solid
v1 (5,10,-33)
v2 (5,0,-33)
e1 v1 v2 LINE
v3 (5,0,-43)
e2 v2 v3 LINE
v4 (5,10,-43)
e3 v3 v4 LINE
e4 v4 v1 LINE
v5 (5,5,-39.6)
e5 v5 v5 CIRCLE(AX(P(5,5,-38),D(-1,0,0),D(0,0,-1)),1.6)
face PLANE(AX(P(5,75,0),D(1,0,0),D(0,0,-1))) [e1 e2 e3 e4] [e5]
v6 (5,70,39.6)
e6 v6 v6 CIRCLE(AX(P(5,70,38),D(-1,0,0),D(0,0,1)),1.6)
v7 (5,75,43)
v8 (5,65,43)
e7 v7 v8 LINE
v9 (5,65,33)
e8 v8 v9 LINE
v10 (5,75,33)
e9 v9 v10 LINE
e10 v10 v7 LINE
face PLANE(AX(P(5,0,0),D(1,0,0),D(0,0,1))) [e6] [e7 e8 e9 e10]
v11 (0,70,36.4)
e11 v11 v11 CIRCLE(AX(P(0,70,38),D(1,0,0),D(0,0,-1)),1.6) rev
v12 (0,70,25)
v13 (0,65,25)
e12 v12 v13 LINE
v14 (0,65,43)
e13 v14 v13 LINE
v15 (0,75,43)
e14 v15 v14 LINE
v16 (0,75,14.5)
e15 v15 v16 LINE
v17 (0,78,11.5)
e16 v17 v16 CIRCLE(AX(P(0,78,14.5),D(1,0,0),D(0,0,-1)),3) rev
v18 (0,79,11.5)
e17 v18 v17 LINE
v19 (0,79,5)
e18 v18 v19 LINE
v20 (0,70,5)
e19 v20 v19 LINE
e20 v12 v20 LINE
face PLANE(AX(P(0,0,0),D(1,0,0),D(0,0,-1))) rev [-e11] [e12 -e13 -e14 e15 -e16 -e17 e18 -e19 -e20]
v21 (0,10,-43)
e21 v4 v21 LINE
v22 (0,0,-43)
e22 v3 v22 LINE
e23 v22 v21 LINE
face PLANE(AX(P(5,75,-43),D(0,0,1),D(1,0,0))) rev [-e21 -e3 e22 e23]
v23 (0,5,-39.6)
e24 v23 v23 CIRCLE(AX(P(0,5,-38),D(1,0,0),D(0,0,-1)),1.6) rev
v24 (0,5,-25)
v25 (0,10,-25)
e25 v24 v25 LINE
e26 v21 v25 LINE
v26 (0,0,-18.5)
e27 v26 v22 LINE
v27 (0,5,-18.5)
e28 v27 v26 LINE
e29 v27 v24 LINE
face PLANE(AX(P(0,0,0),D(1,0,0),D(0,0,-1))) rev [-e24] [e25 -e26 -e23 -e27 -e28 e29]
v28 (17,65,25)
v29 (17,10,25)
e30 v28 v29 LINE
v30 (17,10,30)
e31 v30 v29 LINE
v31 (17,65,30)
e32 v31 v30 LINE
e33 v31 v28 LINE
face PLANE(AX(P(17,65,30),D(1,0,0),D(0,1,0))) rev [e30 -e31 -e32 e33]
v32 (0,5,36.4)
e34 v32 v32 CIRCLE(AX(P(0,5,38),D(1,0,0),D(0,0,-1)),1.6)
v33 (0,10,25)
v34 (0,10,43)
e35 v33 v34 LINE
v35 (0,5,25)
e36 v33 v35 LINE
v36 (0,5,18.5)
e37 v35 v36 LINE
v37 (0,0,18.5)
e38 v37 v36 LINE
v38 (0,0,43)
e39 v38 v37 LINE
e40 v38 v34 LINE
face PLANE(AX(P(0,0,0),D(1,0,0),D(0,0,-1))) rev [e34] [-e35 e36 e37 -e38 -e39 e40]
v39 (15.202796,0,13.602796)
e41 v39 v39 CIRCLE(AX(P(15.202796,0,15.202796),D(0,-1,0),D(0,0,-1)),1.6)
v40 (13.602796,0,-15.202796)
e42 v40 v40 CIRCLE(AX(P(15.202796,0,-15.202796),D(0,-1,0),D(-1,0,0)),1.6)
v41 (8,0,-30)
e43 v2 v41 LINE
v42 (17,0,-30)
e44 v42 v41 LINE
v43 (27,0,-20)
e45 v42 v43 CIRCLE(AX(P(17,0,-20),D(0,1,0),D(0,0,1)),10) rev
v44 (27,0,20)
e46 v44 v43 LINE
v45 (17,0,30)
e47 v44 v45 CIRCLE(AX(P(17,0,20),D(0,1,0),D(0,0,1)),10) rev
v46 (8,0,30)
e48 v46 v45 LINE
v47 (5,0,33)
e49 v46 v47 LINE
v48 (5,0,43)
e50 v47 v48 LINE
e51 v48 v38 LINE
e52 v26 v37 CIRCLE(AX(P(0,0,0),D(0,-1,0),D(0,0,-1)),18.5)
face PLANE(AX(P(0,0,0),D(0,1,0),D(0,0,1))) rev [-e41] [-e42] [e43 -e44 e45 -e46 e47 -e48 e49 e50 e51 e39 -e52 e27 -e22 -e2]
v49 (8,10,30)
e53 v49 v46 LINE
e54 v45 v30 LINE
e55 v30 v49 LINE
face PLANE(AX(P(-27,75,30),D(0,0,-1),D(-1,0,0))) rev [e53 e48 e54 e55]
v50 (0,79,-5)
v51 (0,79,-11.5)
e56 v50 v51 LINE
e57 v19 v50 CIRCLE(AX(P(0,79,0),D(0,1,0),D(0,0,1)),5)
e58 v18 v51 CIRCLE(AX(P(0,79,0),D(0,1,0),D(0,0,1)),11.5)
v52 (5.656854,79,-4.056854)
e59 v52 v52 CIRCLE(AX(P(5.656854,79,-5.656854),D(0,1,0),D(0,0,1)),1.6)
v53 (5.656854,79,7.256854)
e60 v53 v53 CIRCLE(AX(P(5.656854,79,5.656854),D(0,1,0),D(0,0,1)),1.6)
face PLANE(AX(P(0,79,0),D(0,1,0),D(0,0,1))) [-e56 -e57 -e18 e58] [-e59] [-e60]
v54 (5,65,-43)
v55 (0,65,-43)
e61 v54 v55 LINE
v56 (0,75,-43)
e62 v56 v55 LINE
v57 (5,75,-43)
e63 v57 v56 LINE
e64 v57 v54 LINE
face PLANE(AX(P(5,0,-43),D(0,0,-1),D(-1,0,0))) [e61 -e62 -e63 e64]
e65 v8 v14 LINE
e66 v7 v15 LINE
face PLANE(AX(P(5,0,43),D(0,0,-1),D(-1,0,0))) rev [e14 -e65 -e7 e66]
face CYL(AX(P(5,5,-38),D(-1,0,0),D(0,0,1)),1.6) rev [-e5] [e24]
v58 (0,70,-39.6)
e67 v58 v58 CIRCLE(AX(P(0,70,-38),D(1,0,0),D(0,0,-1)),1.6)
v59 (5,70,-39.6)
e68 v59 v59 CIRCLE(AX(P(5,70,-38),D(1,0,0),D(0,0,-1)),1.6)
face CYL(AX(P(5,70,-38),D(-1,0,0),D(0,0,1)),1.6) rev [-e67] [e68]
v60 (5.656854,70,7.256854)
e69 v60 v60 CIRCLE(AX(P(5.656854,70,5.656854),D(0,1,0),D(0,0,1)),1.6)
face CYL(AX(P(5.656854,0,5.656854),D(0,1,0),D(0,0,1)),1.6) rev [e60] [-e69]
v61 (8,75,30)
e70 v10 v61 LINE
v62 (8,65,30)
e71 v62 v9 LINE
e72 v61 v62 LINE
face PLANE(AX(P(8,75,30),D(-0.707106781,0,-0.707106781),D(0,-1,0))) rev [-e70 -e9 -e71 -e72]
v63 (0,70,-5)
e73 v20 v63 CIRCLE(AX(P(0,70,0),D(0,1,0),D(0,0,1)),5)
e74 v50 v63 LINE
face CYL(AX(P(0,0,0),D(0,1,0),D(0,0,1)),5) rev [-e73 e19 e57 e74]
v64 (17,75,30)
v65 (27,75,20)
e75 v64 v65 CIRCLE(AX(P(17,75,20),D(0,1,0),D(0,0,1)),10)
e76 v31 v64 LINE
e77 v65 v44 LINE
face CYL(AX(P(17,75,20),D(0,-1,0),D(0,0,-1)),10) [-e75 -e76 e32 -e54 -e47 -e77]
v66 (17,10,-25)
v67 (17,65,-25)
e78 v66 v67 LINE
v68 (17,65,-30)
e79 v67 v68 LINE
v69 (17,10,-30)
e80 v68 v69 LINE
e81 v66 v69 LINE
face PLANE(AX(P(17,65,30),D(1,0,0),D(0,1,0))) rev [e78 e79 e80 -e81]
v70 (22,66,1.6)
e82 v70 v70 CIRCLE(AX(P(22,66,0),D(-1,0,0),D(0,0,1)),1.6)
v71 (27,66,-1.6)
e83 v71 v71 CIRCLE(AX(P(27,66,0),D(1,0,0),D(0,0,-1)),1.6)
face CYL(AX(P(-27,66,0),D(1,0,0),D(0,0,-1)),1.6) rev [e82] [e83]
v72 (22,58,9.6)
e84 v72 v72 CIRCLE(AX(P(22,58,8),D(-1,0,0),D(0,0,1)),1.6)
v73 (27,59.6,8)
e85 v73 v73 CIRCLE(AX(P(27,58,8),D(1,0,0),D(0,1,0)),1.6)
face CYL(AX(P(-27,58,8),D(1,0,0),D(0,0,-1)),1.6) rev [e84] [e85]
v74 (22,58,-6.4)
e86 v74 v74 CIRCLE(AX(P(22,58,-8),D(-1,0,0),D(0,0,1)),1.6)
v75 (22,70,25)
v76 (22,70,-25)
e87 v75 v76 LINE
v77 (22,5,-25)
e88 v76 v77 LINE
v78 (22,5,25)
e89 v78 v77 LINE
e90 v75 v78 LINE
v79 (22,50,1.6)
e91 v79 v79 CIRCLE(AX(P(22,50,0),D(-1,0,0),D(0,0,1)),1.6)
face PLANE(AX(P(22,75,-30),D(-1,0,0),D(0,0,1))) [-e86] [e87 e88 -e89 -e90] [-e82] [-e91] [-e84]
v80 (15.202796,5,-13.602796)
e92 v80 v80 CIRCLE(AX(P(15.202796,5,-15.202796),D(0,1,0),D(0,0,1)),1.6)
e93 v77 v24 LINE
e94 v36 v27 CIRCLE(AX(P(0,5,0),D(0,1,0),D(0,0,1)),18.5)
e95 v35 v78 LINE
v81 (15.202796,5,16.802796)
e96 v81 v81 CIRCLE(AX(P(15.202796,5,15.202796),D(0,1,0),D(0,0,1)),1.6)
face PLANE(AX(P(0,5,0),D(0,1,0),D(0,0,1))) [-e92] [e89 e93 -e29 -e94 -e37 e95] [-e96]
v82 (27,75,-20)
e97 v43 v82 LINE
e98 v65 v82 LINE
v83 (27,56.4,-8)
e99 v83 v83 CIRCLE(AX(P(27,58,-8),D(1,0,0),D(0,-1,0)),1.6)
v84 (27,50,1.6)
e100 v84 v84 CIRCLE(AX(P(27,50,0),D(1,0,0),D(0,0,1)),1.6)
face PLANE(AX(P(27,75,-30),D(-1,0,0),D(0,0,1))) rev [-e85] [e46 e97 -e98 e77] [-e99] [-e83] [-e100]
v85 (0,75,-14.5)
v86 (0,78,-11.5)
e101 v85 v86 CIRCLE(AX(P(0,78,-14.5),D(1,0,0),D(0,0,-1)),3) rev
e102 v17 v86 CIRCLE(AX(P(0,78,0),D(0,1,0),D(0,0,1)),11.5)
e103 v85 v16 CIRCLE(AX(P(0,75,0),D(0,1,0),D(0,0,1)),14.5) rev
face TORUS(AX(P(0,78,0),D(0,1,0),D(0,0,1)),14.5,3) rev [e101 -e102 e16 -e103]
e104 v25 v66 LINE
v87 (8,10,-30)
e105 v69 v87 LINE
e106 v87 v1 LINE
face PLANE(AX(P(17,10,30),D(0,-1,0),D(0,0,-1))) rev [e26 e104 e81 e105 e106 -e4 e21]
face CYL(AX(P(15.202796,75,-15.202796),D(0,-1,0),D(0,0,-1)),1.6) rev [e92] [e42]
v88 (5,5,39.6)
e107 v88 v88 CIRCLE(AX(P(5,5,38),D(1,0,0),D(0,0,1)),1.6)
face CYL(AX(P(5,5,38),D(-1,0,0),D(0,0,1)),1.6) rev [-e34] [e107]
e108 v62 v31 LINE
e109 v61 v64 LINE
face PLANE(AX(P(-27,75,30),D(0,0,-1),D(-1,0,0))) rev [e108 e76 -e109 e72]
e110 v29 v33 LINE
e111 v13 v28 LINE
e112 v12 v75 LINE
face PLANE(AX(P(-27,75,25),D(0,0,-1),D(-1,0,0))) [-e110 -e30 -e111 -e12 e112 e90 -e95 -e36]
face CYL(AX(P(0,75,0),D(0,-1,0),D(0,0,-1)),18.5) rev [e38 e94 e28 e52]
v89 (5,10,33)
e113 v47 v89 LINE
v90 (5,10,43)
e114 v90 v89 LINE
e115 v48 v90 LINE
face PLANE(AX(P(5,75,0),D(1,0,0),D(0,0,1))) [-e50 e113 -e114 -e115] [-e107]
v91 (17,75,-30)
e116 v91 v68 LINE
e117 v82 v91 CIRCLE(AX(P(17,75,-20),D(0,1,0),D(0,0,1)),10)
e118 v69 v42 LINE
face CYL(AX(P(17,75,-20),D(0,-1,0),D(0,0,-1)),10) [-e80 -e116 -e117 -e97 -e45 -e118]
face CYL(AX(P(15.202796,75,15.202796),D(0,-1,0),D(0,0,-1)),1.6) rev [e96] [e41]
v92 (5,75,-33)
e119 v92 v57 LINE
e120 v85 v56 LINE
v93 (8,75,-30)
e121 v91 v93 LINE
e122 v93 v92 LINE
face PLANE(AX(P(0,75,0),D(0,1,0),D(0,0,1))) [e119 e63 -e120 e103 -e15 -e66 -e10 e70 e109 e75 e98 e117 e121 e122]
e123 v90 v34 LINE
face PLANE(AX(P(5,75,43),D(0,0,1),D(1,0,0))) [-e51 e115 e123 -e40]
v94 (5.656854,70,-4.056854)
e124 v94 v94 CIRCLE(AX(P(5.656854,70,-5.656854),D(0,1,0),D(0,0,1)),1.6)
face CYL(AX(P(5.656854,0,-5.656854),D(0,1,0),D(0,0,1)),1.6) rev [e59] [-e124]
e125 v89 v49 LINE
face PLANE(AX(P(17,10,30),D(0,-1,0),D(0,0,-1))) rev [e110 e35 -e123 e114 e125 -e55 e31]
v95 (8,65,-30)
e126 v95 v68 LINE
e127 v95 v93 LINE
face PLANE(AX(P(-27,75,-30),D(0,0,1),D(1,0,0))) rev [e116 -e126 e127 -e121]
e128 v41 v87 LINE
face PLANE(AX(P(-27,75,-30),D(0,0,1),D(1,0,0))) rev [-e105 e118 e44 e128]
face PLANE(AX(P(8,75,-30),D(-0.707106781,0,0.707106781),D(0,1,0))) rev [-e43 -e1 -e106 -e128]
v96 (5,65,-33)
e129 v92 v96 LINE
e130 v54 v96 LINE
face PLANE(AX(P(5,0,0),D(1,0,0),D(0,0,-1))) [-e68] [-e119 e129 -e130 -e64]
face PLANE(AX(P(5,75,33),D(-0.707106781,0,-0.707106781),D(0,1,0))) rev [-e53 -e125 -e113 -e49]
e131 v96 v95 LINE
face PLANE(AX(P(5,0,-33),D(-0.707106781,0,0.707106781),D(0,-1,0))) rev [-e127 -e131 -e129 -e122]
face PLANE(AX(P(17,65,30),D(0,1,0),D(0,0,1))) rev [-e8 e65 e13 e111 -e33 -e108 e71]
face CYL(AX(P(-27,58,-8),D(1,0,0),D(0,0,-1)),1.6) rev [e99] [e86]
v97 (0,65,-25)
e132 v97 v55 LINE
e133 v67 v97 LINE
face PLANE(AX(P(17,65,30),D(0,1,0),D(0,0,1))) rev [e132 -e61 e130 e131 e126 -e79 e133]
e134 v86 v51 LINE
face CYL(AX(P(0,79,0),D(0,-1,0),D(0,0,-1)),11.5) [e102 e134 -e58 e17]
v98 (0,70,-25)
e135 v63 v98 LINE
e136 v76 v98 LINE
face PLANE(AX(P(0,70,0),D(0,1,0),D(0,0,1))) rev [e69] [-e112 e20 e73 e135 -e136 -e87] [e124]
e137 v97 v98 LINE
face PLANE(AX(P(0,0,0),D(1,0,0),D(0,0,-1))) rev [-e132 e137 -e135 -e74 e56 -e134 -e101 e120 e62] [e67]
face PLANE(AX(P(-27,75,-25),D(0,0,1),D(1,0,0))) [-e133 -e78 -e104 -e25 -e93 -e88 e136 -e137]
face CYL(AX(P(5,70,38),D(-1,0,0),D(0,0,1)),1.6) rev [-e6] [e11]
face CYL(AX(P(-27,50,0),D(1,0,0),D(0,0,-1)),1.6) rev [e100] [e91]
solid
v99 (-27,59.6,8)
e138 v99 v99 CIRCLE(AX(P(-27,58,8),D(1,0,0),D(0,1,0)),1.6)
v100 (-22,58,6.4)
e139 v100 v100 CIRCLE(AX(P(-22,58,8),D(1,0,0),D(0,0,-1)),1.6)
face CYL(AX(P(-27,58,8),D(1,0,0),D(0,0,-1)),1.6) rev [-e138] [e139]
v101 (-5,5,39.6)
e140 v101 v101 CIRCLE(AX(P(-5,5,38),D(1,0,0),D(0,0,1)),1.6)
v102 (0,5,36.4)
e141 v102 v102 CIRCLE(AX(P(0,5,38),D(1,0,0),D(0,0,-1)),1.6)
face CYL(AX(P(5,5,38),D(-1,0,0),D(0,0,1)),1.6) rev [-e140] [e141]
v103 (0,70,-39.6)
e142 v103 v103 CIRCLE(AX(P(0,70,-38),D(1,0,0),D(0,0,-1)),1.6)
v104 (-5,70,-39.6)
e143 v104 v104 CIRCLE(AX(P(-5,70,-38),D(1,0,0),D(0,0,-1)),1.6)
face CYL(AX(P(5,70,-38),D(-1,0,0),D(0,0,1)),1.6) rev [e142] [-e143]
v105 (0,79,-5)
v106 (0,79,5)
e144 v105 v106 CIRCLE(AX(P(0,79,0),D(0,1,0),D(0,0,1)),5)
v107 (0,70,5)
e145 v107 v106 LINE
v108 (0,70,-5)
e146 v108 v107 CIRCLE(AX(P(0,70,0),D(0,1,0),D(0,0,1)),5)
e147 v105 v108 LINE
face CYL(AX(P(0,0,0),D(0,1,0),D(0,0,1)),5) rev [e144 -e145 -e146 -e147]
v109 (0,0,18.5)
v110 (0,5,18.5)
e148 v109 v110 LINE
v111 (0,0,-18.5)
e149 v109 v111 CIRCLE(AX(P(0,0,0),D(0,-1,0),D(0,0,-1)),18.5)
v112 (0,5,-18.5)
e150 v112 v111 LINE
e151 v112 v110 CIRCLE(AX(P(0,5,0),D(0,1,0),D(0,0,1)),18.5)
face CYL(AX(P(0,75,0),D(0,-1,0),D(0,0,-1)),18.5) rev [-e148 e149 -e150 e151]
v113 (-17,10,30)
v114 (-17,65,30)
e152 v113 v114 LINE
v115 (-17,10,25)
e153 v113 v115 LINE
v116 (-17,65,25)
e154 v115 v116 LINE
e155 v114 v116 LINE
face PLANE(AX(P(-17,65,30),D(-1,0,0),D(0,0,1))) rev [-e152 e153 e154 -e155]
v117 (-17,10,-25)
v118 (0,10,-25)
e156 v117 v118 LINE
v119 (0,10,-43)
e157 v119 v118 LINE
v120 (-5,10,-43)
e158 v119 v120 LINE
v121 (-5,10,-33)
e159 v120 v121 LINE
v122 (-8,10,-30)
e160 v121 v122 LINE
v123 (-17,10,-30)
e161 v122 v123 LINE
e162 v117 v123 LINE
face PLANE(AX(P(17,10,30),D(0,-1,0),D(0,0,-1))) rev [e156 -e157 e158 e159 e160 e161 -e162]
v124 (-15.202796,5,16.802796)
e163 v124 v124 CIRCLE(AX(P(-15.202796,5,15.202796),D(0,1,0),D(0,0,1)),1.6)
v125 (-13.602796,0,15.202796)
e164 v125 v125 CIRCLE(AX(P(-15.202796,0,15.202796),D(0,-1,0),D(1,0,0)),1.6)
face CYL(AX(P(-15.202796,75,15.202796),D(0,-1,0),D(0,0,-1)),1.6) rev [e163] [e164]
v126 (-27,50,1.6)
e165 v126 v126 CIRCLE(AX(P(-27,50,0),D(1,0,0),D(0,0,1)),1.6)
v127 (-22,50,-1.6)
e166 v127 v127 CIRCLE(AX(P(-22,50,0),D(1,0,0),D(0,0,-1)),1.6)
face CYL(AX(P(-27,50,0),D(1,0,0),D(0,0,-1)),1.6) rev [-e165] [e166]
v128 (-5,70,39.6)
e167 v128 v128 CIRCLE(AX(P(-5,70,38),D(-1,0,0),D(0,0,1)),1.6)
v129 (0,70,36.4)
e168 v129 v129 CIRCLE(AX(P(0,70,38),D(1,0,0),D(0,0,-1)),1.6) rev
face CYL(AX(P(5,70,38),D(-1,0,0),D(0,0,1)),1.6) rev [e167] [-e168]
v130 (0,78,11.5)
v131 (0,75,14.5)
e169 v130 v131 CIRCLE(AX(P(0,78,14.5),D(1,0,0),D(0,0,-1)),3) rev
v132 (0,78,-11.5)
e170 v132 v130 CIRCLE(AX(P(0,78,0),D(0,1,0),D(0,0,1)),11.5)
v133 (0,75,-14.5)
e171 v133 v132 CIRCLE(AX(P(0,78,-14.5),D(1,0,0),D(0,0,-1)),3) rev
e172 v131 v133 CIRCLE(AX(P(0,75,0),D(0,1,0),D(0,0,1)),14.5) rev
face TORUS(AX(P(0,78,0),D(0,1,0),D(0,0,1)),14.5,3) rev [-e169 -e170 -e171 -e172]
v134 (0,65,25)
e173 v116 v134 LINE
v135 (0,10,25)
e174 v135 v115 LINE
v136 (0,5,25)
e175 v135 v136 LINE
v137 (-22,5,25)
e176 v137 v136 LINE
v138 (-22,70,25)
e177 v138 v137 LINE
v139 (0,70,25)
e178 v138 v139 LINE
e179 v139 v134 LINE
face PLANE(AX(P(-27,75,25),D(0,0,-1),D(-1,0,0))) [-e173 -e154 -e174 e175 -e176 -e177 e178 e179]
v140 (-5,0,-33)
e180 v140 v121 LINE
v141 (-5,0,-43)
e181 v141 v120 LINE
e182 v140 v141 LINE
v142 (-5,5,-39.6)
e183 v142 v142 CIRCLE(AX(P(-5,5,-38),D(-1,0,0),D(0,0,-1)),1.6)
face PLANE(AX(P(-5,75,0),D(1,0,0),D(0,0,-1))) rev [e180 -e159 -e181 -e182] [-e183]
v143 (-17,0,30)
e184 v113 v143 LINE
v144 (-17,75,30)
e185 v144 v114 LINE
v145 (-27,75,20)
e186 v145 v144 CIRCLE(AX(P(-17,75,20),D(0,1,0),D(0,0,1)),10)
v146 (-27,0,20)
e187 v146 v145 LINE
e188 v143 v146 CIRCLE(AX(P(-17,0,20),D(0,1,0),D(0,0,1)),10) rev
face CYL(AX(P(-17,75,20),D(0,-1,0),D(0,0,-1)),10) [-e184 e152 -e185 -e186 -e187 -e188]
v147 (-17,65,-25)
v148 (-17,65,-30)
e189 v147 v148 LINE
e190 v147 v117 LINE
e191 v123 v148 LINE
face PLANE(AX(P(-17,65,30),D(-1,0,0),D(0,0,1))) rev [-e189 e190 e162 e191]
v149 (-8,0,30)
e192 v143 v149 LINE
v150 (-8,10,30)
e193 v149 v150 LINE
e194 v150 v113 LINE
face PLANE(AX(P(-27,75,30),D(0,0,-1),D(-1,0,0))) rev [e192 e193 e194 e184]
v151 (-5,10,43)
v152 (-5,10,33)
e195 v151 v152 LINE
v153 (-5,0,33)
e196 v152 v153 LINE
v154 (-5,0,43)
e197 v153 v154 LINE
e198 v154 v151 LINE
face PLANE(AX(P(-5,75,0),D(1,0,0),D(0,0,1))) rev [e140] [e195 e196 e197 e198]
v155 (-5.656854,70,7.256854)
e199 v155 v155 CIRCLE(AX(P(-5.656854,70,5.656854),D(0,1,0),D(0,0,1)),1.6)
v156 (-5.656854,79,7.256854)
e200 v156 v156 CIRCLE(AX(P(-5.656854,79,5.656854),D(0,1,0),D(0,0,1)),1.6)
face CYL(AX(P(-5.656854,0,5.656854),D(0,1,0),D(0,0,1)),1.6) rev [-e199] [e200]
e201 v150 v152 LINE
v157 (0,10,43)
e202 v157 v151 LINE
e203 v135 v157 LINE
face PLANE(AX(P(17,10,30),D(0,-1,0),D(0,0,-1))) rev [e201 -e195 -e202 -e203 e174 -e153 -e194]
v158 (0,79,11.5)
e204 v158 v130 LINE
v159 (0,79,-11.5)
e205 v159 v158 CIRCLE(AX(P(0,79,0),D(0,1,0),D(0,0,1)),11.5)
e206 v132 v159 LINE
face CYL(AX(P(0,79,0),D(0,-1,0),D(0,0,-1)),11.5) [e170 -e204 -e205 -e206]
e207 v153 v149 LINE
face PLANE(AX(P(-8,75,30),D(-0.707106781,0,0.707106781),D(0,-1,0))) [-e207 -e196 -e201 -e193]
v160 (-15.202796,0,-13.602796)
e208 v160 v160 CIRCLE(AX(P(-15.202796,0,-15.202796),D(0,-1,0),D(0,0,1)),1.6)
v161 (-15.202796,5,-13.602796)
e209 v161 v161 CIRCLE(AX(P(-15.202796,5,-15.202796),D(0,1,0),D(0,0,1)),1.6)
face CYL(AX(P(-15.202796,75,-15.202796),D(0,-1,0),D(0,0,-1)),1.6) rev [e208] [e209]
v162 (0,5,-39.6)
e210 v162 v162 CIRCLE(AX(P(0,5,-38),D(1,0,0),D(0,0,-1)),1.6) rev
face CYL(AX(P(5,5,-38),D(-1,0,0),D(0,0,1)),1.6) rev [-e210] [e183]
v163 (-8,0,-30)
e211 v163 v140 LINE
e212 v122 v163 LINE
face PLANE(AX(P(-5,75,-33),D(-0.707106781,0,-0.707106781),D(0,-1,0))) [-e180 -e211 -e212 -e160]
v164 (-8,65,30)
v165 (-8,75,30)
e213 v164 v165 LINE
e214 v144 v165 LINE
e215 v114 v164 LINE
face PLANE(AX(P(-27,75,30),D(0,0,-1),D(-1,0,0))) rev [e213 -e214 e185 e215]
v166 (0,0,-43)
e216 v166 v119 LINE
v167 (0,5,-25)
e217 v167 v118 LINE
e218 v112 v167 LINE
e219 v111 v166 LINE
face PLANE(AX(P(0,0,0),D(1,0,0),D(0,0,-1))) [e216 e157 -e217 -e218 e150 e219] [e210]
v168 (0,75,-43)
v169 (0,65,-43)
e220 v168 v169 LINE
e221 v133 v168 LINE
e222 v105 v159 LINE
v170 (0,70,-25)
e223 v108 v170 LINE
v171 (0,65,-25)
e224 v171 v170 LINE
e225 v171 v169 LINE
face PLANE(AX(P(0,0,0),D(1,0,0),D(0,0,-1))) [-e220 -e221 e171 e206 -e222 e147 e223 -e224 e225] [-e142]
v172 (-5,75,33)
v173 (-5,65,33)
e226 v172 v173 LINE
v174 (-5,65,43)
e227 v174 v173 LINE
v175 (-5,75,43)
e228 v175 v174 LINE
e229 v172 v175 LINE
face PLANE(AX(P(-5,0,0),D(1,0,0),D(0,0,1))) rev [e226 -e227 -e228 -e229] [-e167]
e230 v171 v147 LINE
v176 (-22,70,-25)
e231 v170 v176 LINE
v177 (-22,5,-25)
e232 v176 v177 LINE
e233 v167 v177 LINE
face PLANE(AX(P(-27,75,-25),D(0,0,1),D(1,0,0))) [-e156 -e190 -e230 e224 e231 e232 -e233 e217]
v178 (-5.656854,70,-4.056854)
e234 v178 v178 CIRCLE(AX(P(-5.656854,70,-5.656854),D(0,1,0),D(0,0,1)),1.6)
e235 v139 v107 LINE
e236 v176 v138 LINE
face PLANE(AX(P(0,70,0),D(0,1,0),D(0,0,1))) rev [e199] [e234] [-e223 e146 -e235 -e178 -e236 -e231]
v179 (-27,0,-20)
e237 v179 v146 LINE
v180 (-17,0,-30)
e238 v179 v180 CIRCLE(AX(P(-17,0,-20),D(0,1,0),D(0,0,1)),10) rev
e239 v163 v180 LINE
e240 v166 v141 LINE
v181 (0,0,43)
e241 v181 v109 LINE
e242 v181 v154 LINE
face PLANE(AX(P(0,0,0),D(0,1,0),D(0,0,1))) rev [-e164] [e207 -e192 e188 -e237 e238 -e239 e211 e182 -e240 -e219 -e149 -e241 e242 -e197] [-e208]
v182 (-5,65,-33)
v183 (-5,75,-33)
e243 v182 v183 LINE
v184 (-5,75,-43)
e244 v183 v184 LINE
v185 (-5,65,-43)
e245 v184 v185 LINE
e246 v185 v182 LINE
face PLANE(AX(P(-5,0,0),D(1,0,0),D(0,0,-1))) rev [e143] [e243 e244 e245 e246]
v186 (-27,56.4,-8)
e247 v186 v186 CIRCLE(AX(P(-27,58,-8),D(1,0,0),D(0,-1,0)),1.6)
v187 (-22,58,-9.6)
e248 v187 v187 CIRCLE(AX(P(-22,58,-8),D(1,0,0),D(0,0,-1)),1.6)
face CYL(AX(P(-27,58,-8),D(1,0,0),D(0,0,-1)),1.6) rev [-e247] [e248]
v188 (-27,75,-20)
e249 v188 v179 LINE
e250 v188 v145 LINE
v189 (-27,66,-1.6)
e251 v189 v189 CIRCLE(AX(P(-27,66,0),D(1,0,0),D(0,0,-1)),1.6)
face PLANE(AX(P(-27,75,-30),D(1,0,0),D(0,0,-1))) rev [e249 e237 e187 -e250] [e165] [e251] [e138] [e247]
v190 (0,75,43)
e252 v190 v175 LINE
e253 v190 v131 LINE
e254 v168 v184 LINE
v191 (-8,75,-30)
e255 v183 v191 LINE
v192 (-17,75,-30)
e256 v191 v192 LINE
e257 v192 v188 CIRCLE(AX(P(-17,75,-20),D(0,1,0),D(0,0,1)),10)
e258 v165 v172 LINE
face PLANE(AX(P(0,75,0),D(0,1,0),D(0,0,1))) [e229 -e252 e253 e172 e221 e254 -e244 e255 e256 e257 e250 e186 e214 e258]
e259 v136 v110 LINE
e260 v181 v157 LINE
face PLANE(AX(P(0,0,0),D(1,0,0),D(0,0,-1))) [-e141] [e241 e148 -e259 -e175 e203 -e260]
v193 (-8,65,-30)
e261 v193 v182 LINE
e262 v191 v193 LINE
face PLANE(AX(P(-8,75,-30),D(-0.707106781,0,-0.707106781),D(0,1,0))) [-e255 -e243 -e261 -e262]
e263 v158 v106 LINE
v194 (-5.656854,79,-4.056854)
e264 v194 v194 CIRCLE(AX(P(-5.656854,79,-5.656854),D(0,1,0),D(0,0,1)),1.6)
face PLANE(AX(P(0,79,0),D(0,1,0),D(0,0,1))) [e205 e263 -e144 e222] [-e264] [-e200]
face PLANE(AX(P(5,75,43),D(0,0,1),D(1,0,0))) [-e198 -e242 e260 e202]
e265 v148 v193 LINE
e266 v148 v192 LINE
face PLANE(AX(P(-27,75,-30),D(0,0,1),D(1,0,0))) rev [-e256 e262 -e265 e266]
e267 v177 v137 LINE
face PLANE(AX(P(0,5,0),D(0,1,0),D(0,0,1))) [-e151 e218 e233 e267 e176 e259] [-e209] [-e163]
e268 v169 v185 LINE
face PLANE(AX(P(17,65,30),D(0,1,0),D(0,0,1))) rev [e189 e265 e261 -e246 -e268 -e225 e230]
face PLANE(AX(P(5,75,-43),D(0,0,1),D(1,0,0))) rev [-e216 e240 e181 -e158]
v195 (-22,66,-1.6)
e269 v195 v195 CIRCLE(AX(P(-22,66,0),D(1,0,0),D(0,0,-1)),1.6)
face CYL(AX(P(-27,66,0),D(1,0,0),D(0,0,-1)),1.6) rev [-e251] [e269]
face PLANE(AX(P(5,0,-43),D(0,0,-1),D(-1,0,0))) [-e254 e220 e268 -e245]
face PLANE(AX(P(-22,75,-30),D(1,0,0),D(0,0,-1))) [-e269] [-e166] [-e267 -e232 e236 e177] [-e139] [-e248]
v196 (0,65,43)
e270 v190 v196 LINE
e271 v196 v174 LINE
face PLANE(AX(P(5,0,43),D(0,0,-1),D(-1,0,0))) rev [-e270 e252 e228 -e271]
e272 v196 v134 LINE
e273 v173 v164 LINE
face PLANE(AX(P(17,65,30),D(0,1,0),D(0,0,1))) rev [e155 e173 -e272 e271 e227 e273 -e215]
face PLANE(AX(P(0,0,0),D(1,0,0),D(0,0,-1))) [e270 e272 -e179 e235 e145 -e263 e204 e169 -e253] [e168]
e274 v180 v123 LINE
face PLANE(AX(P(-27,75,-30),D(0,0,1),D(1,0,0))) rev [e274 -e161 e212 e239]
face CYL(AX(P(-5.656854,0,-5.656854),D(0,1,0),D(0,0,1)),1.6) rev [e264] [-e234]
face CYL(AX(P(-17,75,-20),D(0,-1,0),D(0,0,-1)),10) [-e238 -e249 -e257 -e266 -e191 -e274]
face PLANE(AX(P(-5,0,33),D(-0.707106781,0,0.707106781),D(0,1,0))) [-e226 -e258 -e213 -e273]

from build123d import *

# Parameters (mm, degrees)
SKETCH2_W                                  = 54
SKETCH2_H                                  = 60
BOSS_EXTRUDE1_DEPTH                        = 75
SHELL2_T                                   = -5
SKETCH4_R                                  = 18.5
CUT_EXTRUDE2_DEPTH                         = 86.170417399
SKETCH5_R                                  = 1.6
CUT_EXTRUDE3_DEPTH                         = 86.170417399
CIRPATTERN2_COUNT                          = 4
SKETCH6_R                                  = 1.6
CUT_EXTRUDE4_DEPTH                         = 98.164808444
CIRPATTERN3_COUNT                          = 4
SKETCH7_W                                  = 44
SKETCH7_H                                  = 50
BOSS_EXTRUDE2_DEPTH                        = 5
SKETCH8_R                                  = 5
CUT_EXTRUDE5_DEPTH                         = 86.170417399
SKETCH9_R                                  = 1.6
CUT_EXTRUDE6_DEPTH                         = 86.170417399
CIRPATTERN4_COUNT                          = 4
SKETCH10_W                                 = 34
SKETCH10_H                                 = 55
CUT_EXTRUDE7_DEPTH                         = 100.76973489
FILLET1_R                                  = 10
SKETCH11_W                                 = 13
SKETCH11_H                                 = 10
SKETCH11_R                                 = 1.6
BOSS_EXTRUDE3_DEPTH                        = 5
MIRROR4_AT_THE_SECOND_PLANE_COPY_1_SKETC_W = 13
MIRROR4_AT_THE_SECOND_PLANE_COPY_1_SKETC_H = 10
MIRROR4_AT_THE_SECOND_PLANE_COPY_1_SKETC_R = 1.6
MIRROR4_AT_THE_SECOND_PLANE_COPY_1_DEPTH   = 5
CHAMFER1_SIZE                              = 3
BOSS_EXTRUDE4_START                        = 4
SKETCH12_R                                 = 11.5
SKETCH12_R_2                               = 1.6
SKETCH12_R_3                               = 5
BOSS_EXTRUDE4_DEPTH                        = 4
FILLET2_R                                  = 3


with BuildPart() as part:
    # Sketch2 → Boss-Extrude1 (new body)
    with BuildSketch(Plane(origin=(0, 0, 0), x_dir=(1, 0, 0), z_dir=(0, 1, 0))):
        Rectangle(SKETCH2_W, SKETCH2_H)
    extrude(amount=BOSS_EXTRUDE1_DEPTH)

    # Shell2
    shell2_openings = [part.faces().sort_by_distance(p)[0] for p in [
        (0, 75, 0),
    ]]
    offset(amount=SHELL2_T, openings=shell2_openings, kind=Kind.INTERSECTION)

    # Sketch4 → Cut-Extrude2 (cut, through all)
    with BuildSketch(Plane.XZ):
        with Locations(Location((0, 0, 0), (0, 0, 270))):
            Circle(SKETCH4_R)
    extrude(amount=-CUT_EXTRUDE2_DEPTH, mode=Mode.SUBTRACT)

    # Sketch5 → Cut-Extrude3 (cut, through all)
    with BuildSketch(Plane.XZ):
        with Locations(Location((15.202795796, 15.202795796, 0), (0, 0, 270))):
            Circle(SKETCH5_R)
    cut_extrude3 = extrude(amount=-CUT_EXTRUDE3_DEPTH, mode=Mode.SUBTRACT)

    # CirPattern2: Cut-Extrude3 ×4 about axis
    cirpattern2_axis = Axis((0, 0, 0), (0, 1, 0))
    for i in range(1, CIRPATTERN2_COUNT):
        add(cut_extrude3.rotate(cirpattern2_axis, i * 360 / CIRPATTERN2_COUNT), mode=Mode.SUBTRACT)

    # Sketch6 → Cut-Extrude4 (cut, through all)
    with BuildSketch(Plane(origin=(27, 0, 0), x_dir=(0, 0, -1), z_dir=(1, 0, 0))):
        with Locations((0, 66)):
            Circle(SKETCH6_R)
    cut_extrude4 = extrude(amount=-CUT_EXTRUDE4_DEPTH, mode=Mode.SUBTRACT)

    # CirPattern3: Cut-Extrude4 ×4 about axis
    cirpattern3_axis = Axis((0, 58, 0), (1, 0, 0))
    for i in range(1, CIRPATTERN3_COUNT):
        add(cut_extrude4.rotate(cirpattern3_axis, i * 360 / CIRPATTERN3_COUNT), mode=Mode.SUBTRACT)

    # Sketch7 → Boss-Extrude2 (add)
    with BuildSketch(Plane(origin=(0, 75, 0), x_dir=(1, 0, 0), z_dir=(0, 1, 0))):
        Rectangle(SKETCH7_W, SKETCH7_H)
    extrude(amount=-BOSS_EXTRUDE2_DEPTH)

    # Sketch8 → Cut-Extrude5 (cut, through all)
    with BuildSketch(Plane(origin=(0, 75, 0), x_dir=(1, 0, 0), z_dir=(0, 1, 0))):
        with Locations(Location((0, 0, 0), (0, 0, 270))):
            Circle(SKETCH8_R)
    extrude(amount=-CUT_EXTRUDE5_DEPTH, mode=Mode.SUBTRACT)

    # Sketch9 → Cut-Extrude6 (cut, through all)
    with BuildSketch(Plane(origin=(0, 75, 0), x_dir=(1, 0, 0), z_dir=(0, 1, 0))):
        with Locations(Location((5.656854249, 5.656854249, 0), (0, 0, 270))):
            Circle(SKETCH9_R)
    cut_extrude6 = extrude(amount=-CUT_EXTRUDE6_DEPTH, mode=Mode.SUBTRACT)

    # CirPattern4: Cut-Extrude6 ×4 about axis
    cirpattern4_axis = Axis((0, 0, 0), (0, 1, 0))
    for i in range(1, CIRPATTERN4_COUNT):
        add(cut_extrude6.rotate(cirpattern4_axis, i * 360 / CIRPATTERN4_COUNT), mode=Mode.SUBTRACT)

    # Sketch10 → Cut-Extrude7 (cut, through all)
    with BuildSketch(Plane(origin=(0, 0, -30), x_dir=(-1, 0, 0), z_dir=(0, 0, -1))):
        with Locations((0, 37.5)):
            Rectangle(SKETCH10_W, SKETCH10_H)
    extrude(amount=-CUT_EXTRUDE7_DEPTH, mode=Mode.SUBTRACT)

    # Fillet1
    fillet1_edges = [part.edges().sort_by_distance(p)[0] for p in [
        (27, 37.5, 30),
        (-27, 37.5, 30),
        (-27, 37.5, -30),
        (27, 37.5, -30),
    ]]
    fillet(fillet1_edges, radius=FILLET1_R - 0.0001)  # a hair under: the kernel refuses the full size

    # Sketch11 → Boss-Extrude3 (add, symmetric)
    with BuildSketch(Plane(origin=(0, 0, 0), x_dir=(0, 0, -1), z_dir=(1, 0, 0))):
        with Locations((36.5, 70)):
            Rectangle(SKETCH11_W, SKETCH11_H)
        with Locations((38, 70)):
            Circle(SKETCH11_R, mode=Mode.SUBTRACT)
    boss_extrude3 = extrude(amount=BOSS_EXTRUDE3_DEPTH, both=True)

    # Mirror4: Boss-Extrude3 across plane
    add(boss_extrude3.mirror(Plane.XY))

    # Mirror4 at the second plane: Boss-Extrude3 across plane
    add(boss_extrude3.mirror(Plane.ZX.offset(37.5)))

    # Mirror4 at the second plane copy 1 sketc → Mirror4 at the second plane copy 1 (add, symmetric)
    with BuildSketch(Plane(origin=(0, 75, 0), x_dir=(0, 0, 1), z_dir=(1, 0, 0))):
        with Locations((36.5, 70)):
            Rectangle(MIRROR4_AT_THE_SECOND_PLANE_COPY_1_SKETC_W, MIRROR4_AT_THE_SECOND_PLANE_COPY_1_SKETC_H)
        with Locations((38, 70)):
            Circle(MIRROR4_AT_THE_SECOND_PLANE_COPY_1_SKETC_R, mode=Mode.SUBTRACT)
    extrude(amount=MIRROR4_AT_THE_SECOND_PLANE_COPY_1_DEPTH, both=True)

    # Chamfer1
    chamfer1_edges = [part.edges().sort_by_distance(p)[0] for p in [
        (-5, 70, -30),
        (5, 70, -30),
        (5, 5, -30),
        (-5, 5, -30),
        (5, 70, 30),
        (-5, 70, 30),
        (-5, 5, 30),
        (5, 5, 30),
    ]]
    chamfer(chamfer1_edges, length=CHAMFER1_SIZE)

    # Sketch12 → Boss-Extrude4 (add)
    with BuildSketch(Plane(origin=(0, 75, 0), x_dir=(1, 0, 0), z_dir=(0, 1, 0)).offset(BOSS_EXTRUDE4_START)):
        with Locations(Location((0, 0, 0), (0, 0, 270))):
            Circle(SKETCH12_R)
        with Locations(Location((5.656854249, -5.656854249, 0), (0, 0, 270))):
            Circle(SKETCH12_R_2, mode=Mode.SUBTRACT)
        with Locations(Location((-5.656854249, -5.656854249, 0), (0, 0, 270))):
            Circle(SKETCH12_R_2, mode=Mode.SUBTRACT)
        with Locations(Location((-5.656854249, 5.656854249, 0), (0, 0, 270))):
            Circle(SKETCH12_R_2, mode=Mode.SUBTRACT)
        with Locations(Location((5.656854249, 5.656854249, 0), (0, 0, 270))):
            Circle(SKETCH12_R_2, mode=Mode.SUBTRACT)
        with Locations(Location((0, 0, 0), (0, 0, 270))):
            Circle(SKETCH12_R_3, mode=Mode.SUBTRACT)
    extrude(amount=-BOSS_EXTRUDE4_DEPTH)

    # Fillet2
    fillet2_edges = [part.edges().sort_by_distance(p)[0] for p in [
        (0, 75, -11.5),
    ]]
    fillet(fillet2_edges, radius=FILLET2_R)


with BuildPart() as body_2:
    # Split1: the piece on the far side of the plane
    add(part.part)
    split(bisect_by=Plane(origin=(0, 0, 0), x_dir=(0, 0, 1), z_dir=(1, 0, 0)), keep=Keep.BOTTOM)


with BuildPart() as part_1:
    add(part.part)

    # Split1
    split(bisect_by=Plane(origin=(0, 0, 0), x_dir=(0, 0, 1), z_dir=(1, 0, 0)), keep=Keep.TOP)


solid = Compound([body_2.part, part_1.part])
